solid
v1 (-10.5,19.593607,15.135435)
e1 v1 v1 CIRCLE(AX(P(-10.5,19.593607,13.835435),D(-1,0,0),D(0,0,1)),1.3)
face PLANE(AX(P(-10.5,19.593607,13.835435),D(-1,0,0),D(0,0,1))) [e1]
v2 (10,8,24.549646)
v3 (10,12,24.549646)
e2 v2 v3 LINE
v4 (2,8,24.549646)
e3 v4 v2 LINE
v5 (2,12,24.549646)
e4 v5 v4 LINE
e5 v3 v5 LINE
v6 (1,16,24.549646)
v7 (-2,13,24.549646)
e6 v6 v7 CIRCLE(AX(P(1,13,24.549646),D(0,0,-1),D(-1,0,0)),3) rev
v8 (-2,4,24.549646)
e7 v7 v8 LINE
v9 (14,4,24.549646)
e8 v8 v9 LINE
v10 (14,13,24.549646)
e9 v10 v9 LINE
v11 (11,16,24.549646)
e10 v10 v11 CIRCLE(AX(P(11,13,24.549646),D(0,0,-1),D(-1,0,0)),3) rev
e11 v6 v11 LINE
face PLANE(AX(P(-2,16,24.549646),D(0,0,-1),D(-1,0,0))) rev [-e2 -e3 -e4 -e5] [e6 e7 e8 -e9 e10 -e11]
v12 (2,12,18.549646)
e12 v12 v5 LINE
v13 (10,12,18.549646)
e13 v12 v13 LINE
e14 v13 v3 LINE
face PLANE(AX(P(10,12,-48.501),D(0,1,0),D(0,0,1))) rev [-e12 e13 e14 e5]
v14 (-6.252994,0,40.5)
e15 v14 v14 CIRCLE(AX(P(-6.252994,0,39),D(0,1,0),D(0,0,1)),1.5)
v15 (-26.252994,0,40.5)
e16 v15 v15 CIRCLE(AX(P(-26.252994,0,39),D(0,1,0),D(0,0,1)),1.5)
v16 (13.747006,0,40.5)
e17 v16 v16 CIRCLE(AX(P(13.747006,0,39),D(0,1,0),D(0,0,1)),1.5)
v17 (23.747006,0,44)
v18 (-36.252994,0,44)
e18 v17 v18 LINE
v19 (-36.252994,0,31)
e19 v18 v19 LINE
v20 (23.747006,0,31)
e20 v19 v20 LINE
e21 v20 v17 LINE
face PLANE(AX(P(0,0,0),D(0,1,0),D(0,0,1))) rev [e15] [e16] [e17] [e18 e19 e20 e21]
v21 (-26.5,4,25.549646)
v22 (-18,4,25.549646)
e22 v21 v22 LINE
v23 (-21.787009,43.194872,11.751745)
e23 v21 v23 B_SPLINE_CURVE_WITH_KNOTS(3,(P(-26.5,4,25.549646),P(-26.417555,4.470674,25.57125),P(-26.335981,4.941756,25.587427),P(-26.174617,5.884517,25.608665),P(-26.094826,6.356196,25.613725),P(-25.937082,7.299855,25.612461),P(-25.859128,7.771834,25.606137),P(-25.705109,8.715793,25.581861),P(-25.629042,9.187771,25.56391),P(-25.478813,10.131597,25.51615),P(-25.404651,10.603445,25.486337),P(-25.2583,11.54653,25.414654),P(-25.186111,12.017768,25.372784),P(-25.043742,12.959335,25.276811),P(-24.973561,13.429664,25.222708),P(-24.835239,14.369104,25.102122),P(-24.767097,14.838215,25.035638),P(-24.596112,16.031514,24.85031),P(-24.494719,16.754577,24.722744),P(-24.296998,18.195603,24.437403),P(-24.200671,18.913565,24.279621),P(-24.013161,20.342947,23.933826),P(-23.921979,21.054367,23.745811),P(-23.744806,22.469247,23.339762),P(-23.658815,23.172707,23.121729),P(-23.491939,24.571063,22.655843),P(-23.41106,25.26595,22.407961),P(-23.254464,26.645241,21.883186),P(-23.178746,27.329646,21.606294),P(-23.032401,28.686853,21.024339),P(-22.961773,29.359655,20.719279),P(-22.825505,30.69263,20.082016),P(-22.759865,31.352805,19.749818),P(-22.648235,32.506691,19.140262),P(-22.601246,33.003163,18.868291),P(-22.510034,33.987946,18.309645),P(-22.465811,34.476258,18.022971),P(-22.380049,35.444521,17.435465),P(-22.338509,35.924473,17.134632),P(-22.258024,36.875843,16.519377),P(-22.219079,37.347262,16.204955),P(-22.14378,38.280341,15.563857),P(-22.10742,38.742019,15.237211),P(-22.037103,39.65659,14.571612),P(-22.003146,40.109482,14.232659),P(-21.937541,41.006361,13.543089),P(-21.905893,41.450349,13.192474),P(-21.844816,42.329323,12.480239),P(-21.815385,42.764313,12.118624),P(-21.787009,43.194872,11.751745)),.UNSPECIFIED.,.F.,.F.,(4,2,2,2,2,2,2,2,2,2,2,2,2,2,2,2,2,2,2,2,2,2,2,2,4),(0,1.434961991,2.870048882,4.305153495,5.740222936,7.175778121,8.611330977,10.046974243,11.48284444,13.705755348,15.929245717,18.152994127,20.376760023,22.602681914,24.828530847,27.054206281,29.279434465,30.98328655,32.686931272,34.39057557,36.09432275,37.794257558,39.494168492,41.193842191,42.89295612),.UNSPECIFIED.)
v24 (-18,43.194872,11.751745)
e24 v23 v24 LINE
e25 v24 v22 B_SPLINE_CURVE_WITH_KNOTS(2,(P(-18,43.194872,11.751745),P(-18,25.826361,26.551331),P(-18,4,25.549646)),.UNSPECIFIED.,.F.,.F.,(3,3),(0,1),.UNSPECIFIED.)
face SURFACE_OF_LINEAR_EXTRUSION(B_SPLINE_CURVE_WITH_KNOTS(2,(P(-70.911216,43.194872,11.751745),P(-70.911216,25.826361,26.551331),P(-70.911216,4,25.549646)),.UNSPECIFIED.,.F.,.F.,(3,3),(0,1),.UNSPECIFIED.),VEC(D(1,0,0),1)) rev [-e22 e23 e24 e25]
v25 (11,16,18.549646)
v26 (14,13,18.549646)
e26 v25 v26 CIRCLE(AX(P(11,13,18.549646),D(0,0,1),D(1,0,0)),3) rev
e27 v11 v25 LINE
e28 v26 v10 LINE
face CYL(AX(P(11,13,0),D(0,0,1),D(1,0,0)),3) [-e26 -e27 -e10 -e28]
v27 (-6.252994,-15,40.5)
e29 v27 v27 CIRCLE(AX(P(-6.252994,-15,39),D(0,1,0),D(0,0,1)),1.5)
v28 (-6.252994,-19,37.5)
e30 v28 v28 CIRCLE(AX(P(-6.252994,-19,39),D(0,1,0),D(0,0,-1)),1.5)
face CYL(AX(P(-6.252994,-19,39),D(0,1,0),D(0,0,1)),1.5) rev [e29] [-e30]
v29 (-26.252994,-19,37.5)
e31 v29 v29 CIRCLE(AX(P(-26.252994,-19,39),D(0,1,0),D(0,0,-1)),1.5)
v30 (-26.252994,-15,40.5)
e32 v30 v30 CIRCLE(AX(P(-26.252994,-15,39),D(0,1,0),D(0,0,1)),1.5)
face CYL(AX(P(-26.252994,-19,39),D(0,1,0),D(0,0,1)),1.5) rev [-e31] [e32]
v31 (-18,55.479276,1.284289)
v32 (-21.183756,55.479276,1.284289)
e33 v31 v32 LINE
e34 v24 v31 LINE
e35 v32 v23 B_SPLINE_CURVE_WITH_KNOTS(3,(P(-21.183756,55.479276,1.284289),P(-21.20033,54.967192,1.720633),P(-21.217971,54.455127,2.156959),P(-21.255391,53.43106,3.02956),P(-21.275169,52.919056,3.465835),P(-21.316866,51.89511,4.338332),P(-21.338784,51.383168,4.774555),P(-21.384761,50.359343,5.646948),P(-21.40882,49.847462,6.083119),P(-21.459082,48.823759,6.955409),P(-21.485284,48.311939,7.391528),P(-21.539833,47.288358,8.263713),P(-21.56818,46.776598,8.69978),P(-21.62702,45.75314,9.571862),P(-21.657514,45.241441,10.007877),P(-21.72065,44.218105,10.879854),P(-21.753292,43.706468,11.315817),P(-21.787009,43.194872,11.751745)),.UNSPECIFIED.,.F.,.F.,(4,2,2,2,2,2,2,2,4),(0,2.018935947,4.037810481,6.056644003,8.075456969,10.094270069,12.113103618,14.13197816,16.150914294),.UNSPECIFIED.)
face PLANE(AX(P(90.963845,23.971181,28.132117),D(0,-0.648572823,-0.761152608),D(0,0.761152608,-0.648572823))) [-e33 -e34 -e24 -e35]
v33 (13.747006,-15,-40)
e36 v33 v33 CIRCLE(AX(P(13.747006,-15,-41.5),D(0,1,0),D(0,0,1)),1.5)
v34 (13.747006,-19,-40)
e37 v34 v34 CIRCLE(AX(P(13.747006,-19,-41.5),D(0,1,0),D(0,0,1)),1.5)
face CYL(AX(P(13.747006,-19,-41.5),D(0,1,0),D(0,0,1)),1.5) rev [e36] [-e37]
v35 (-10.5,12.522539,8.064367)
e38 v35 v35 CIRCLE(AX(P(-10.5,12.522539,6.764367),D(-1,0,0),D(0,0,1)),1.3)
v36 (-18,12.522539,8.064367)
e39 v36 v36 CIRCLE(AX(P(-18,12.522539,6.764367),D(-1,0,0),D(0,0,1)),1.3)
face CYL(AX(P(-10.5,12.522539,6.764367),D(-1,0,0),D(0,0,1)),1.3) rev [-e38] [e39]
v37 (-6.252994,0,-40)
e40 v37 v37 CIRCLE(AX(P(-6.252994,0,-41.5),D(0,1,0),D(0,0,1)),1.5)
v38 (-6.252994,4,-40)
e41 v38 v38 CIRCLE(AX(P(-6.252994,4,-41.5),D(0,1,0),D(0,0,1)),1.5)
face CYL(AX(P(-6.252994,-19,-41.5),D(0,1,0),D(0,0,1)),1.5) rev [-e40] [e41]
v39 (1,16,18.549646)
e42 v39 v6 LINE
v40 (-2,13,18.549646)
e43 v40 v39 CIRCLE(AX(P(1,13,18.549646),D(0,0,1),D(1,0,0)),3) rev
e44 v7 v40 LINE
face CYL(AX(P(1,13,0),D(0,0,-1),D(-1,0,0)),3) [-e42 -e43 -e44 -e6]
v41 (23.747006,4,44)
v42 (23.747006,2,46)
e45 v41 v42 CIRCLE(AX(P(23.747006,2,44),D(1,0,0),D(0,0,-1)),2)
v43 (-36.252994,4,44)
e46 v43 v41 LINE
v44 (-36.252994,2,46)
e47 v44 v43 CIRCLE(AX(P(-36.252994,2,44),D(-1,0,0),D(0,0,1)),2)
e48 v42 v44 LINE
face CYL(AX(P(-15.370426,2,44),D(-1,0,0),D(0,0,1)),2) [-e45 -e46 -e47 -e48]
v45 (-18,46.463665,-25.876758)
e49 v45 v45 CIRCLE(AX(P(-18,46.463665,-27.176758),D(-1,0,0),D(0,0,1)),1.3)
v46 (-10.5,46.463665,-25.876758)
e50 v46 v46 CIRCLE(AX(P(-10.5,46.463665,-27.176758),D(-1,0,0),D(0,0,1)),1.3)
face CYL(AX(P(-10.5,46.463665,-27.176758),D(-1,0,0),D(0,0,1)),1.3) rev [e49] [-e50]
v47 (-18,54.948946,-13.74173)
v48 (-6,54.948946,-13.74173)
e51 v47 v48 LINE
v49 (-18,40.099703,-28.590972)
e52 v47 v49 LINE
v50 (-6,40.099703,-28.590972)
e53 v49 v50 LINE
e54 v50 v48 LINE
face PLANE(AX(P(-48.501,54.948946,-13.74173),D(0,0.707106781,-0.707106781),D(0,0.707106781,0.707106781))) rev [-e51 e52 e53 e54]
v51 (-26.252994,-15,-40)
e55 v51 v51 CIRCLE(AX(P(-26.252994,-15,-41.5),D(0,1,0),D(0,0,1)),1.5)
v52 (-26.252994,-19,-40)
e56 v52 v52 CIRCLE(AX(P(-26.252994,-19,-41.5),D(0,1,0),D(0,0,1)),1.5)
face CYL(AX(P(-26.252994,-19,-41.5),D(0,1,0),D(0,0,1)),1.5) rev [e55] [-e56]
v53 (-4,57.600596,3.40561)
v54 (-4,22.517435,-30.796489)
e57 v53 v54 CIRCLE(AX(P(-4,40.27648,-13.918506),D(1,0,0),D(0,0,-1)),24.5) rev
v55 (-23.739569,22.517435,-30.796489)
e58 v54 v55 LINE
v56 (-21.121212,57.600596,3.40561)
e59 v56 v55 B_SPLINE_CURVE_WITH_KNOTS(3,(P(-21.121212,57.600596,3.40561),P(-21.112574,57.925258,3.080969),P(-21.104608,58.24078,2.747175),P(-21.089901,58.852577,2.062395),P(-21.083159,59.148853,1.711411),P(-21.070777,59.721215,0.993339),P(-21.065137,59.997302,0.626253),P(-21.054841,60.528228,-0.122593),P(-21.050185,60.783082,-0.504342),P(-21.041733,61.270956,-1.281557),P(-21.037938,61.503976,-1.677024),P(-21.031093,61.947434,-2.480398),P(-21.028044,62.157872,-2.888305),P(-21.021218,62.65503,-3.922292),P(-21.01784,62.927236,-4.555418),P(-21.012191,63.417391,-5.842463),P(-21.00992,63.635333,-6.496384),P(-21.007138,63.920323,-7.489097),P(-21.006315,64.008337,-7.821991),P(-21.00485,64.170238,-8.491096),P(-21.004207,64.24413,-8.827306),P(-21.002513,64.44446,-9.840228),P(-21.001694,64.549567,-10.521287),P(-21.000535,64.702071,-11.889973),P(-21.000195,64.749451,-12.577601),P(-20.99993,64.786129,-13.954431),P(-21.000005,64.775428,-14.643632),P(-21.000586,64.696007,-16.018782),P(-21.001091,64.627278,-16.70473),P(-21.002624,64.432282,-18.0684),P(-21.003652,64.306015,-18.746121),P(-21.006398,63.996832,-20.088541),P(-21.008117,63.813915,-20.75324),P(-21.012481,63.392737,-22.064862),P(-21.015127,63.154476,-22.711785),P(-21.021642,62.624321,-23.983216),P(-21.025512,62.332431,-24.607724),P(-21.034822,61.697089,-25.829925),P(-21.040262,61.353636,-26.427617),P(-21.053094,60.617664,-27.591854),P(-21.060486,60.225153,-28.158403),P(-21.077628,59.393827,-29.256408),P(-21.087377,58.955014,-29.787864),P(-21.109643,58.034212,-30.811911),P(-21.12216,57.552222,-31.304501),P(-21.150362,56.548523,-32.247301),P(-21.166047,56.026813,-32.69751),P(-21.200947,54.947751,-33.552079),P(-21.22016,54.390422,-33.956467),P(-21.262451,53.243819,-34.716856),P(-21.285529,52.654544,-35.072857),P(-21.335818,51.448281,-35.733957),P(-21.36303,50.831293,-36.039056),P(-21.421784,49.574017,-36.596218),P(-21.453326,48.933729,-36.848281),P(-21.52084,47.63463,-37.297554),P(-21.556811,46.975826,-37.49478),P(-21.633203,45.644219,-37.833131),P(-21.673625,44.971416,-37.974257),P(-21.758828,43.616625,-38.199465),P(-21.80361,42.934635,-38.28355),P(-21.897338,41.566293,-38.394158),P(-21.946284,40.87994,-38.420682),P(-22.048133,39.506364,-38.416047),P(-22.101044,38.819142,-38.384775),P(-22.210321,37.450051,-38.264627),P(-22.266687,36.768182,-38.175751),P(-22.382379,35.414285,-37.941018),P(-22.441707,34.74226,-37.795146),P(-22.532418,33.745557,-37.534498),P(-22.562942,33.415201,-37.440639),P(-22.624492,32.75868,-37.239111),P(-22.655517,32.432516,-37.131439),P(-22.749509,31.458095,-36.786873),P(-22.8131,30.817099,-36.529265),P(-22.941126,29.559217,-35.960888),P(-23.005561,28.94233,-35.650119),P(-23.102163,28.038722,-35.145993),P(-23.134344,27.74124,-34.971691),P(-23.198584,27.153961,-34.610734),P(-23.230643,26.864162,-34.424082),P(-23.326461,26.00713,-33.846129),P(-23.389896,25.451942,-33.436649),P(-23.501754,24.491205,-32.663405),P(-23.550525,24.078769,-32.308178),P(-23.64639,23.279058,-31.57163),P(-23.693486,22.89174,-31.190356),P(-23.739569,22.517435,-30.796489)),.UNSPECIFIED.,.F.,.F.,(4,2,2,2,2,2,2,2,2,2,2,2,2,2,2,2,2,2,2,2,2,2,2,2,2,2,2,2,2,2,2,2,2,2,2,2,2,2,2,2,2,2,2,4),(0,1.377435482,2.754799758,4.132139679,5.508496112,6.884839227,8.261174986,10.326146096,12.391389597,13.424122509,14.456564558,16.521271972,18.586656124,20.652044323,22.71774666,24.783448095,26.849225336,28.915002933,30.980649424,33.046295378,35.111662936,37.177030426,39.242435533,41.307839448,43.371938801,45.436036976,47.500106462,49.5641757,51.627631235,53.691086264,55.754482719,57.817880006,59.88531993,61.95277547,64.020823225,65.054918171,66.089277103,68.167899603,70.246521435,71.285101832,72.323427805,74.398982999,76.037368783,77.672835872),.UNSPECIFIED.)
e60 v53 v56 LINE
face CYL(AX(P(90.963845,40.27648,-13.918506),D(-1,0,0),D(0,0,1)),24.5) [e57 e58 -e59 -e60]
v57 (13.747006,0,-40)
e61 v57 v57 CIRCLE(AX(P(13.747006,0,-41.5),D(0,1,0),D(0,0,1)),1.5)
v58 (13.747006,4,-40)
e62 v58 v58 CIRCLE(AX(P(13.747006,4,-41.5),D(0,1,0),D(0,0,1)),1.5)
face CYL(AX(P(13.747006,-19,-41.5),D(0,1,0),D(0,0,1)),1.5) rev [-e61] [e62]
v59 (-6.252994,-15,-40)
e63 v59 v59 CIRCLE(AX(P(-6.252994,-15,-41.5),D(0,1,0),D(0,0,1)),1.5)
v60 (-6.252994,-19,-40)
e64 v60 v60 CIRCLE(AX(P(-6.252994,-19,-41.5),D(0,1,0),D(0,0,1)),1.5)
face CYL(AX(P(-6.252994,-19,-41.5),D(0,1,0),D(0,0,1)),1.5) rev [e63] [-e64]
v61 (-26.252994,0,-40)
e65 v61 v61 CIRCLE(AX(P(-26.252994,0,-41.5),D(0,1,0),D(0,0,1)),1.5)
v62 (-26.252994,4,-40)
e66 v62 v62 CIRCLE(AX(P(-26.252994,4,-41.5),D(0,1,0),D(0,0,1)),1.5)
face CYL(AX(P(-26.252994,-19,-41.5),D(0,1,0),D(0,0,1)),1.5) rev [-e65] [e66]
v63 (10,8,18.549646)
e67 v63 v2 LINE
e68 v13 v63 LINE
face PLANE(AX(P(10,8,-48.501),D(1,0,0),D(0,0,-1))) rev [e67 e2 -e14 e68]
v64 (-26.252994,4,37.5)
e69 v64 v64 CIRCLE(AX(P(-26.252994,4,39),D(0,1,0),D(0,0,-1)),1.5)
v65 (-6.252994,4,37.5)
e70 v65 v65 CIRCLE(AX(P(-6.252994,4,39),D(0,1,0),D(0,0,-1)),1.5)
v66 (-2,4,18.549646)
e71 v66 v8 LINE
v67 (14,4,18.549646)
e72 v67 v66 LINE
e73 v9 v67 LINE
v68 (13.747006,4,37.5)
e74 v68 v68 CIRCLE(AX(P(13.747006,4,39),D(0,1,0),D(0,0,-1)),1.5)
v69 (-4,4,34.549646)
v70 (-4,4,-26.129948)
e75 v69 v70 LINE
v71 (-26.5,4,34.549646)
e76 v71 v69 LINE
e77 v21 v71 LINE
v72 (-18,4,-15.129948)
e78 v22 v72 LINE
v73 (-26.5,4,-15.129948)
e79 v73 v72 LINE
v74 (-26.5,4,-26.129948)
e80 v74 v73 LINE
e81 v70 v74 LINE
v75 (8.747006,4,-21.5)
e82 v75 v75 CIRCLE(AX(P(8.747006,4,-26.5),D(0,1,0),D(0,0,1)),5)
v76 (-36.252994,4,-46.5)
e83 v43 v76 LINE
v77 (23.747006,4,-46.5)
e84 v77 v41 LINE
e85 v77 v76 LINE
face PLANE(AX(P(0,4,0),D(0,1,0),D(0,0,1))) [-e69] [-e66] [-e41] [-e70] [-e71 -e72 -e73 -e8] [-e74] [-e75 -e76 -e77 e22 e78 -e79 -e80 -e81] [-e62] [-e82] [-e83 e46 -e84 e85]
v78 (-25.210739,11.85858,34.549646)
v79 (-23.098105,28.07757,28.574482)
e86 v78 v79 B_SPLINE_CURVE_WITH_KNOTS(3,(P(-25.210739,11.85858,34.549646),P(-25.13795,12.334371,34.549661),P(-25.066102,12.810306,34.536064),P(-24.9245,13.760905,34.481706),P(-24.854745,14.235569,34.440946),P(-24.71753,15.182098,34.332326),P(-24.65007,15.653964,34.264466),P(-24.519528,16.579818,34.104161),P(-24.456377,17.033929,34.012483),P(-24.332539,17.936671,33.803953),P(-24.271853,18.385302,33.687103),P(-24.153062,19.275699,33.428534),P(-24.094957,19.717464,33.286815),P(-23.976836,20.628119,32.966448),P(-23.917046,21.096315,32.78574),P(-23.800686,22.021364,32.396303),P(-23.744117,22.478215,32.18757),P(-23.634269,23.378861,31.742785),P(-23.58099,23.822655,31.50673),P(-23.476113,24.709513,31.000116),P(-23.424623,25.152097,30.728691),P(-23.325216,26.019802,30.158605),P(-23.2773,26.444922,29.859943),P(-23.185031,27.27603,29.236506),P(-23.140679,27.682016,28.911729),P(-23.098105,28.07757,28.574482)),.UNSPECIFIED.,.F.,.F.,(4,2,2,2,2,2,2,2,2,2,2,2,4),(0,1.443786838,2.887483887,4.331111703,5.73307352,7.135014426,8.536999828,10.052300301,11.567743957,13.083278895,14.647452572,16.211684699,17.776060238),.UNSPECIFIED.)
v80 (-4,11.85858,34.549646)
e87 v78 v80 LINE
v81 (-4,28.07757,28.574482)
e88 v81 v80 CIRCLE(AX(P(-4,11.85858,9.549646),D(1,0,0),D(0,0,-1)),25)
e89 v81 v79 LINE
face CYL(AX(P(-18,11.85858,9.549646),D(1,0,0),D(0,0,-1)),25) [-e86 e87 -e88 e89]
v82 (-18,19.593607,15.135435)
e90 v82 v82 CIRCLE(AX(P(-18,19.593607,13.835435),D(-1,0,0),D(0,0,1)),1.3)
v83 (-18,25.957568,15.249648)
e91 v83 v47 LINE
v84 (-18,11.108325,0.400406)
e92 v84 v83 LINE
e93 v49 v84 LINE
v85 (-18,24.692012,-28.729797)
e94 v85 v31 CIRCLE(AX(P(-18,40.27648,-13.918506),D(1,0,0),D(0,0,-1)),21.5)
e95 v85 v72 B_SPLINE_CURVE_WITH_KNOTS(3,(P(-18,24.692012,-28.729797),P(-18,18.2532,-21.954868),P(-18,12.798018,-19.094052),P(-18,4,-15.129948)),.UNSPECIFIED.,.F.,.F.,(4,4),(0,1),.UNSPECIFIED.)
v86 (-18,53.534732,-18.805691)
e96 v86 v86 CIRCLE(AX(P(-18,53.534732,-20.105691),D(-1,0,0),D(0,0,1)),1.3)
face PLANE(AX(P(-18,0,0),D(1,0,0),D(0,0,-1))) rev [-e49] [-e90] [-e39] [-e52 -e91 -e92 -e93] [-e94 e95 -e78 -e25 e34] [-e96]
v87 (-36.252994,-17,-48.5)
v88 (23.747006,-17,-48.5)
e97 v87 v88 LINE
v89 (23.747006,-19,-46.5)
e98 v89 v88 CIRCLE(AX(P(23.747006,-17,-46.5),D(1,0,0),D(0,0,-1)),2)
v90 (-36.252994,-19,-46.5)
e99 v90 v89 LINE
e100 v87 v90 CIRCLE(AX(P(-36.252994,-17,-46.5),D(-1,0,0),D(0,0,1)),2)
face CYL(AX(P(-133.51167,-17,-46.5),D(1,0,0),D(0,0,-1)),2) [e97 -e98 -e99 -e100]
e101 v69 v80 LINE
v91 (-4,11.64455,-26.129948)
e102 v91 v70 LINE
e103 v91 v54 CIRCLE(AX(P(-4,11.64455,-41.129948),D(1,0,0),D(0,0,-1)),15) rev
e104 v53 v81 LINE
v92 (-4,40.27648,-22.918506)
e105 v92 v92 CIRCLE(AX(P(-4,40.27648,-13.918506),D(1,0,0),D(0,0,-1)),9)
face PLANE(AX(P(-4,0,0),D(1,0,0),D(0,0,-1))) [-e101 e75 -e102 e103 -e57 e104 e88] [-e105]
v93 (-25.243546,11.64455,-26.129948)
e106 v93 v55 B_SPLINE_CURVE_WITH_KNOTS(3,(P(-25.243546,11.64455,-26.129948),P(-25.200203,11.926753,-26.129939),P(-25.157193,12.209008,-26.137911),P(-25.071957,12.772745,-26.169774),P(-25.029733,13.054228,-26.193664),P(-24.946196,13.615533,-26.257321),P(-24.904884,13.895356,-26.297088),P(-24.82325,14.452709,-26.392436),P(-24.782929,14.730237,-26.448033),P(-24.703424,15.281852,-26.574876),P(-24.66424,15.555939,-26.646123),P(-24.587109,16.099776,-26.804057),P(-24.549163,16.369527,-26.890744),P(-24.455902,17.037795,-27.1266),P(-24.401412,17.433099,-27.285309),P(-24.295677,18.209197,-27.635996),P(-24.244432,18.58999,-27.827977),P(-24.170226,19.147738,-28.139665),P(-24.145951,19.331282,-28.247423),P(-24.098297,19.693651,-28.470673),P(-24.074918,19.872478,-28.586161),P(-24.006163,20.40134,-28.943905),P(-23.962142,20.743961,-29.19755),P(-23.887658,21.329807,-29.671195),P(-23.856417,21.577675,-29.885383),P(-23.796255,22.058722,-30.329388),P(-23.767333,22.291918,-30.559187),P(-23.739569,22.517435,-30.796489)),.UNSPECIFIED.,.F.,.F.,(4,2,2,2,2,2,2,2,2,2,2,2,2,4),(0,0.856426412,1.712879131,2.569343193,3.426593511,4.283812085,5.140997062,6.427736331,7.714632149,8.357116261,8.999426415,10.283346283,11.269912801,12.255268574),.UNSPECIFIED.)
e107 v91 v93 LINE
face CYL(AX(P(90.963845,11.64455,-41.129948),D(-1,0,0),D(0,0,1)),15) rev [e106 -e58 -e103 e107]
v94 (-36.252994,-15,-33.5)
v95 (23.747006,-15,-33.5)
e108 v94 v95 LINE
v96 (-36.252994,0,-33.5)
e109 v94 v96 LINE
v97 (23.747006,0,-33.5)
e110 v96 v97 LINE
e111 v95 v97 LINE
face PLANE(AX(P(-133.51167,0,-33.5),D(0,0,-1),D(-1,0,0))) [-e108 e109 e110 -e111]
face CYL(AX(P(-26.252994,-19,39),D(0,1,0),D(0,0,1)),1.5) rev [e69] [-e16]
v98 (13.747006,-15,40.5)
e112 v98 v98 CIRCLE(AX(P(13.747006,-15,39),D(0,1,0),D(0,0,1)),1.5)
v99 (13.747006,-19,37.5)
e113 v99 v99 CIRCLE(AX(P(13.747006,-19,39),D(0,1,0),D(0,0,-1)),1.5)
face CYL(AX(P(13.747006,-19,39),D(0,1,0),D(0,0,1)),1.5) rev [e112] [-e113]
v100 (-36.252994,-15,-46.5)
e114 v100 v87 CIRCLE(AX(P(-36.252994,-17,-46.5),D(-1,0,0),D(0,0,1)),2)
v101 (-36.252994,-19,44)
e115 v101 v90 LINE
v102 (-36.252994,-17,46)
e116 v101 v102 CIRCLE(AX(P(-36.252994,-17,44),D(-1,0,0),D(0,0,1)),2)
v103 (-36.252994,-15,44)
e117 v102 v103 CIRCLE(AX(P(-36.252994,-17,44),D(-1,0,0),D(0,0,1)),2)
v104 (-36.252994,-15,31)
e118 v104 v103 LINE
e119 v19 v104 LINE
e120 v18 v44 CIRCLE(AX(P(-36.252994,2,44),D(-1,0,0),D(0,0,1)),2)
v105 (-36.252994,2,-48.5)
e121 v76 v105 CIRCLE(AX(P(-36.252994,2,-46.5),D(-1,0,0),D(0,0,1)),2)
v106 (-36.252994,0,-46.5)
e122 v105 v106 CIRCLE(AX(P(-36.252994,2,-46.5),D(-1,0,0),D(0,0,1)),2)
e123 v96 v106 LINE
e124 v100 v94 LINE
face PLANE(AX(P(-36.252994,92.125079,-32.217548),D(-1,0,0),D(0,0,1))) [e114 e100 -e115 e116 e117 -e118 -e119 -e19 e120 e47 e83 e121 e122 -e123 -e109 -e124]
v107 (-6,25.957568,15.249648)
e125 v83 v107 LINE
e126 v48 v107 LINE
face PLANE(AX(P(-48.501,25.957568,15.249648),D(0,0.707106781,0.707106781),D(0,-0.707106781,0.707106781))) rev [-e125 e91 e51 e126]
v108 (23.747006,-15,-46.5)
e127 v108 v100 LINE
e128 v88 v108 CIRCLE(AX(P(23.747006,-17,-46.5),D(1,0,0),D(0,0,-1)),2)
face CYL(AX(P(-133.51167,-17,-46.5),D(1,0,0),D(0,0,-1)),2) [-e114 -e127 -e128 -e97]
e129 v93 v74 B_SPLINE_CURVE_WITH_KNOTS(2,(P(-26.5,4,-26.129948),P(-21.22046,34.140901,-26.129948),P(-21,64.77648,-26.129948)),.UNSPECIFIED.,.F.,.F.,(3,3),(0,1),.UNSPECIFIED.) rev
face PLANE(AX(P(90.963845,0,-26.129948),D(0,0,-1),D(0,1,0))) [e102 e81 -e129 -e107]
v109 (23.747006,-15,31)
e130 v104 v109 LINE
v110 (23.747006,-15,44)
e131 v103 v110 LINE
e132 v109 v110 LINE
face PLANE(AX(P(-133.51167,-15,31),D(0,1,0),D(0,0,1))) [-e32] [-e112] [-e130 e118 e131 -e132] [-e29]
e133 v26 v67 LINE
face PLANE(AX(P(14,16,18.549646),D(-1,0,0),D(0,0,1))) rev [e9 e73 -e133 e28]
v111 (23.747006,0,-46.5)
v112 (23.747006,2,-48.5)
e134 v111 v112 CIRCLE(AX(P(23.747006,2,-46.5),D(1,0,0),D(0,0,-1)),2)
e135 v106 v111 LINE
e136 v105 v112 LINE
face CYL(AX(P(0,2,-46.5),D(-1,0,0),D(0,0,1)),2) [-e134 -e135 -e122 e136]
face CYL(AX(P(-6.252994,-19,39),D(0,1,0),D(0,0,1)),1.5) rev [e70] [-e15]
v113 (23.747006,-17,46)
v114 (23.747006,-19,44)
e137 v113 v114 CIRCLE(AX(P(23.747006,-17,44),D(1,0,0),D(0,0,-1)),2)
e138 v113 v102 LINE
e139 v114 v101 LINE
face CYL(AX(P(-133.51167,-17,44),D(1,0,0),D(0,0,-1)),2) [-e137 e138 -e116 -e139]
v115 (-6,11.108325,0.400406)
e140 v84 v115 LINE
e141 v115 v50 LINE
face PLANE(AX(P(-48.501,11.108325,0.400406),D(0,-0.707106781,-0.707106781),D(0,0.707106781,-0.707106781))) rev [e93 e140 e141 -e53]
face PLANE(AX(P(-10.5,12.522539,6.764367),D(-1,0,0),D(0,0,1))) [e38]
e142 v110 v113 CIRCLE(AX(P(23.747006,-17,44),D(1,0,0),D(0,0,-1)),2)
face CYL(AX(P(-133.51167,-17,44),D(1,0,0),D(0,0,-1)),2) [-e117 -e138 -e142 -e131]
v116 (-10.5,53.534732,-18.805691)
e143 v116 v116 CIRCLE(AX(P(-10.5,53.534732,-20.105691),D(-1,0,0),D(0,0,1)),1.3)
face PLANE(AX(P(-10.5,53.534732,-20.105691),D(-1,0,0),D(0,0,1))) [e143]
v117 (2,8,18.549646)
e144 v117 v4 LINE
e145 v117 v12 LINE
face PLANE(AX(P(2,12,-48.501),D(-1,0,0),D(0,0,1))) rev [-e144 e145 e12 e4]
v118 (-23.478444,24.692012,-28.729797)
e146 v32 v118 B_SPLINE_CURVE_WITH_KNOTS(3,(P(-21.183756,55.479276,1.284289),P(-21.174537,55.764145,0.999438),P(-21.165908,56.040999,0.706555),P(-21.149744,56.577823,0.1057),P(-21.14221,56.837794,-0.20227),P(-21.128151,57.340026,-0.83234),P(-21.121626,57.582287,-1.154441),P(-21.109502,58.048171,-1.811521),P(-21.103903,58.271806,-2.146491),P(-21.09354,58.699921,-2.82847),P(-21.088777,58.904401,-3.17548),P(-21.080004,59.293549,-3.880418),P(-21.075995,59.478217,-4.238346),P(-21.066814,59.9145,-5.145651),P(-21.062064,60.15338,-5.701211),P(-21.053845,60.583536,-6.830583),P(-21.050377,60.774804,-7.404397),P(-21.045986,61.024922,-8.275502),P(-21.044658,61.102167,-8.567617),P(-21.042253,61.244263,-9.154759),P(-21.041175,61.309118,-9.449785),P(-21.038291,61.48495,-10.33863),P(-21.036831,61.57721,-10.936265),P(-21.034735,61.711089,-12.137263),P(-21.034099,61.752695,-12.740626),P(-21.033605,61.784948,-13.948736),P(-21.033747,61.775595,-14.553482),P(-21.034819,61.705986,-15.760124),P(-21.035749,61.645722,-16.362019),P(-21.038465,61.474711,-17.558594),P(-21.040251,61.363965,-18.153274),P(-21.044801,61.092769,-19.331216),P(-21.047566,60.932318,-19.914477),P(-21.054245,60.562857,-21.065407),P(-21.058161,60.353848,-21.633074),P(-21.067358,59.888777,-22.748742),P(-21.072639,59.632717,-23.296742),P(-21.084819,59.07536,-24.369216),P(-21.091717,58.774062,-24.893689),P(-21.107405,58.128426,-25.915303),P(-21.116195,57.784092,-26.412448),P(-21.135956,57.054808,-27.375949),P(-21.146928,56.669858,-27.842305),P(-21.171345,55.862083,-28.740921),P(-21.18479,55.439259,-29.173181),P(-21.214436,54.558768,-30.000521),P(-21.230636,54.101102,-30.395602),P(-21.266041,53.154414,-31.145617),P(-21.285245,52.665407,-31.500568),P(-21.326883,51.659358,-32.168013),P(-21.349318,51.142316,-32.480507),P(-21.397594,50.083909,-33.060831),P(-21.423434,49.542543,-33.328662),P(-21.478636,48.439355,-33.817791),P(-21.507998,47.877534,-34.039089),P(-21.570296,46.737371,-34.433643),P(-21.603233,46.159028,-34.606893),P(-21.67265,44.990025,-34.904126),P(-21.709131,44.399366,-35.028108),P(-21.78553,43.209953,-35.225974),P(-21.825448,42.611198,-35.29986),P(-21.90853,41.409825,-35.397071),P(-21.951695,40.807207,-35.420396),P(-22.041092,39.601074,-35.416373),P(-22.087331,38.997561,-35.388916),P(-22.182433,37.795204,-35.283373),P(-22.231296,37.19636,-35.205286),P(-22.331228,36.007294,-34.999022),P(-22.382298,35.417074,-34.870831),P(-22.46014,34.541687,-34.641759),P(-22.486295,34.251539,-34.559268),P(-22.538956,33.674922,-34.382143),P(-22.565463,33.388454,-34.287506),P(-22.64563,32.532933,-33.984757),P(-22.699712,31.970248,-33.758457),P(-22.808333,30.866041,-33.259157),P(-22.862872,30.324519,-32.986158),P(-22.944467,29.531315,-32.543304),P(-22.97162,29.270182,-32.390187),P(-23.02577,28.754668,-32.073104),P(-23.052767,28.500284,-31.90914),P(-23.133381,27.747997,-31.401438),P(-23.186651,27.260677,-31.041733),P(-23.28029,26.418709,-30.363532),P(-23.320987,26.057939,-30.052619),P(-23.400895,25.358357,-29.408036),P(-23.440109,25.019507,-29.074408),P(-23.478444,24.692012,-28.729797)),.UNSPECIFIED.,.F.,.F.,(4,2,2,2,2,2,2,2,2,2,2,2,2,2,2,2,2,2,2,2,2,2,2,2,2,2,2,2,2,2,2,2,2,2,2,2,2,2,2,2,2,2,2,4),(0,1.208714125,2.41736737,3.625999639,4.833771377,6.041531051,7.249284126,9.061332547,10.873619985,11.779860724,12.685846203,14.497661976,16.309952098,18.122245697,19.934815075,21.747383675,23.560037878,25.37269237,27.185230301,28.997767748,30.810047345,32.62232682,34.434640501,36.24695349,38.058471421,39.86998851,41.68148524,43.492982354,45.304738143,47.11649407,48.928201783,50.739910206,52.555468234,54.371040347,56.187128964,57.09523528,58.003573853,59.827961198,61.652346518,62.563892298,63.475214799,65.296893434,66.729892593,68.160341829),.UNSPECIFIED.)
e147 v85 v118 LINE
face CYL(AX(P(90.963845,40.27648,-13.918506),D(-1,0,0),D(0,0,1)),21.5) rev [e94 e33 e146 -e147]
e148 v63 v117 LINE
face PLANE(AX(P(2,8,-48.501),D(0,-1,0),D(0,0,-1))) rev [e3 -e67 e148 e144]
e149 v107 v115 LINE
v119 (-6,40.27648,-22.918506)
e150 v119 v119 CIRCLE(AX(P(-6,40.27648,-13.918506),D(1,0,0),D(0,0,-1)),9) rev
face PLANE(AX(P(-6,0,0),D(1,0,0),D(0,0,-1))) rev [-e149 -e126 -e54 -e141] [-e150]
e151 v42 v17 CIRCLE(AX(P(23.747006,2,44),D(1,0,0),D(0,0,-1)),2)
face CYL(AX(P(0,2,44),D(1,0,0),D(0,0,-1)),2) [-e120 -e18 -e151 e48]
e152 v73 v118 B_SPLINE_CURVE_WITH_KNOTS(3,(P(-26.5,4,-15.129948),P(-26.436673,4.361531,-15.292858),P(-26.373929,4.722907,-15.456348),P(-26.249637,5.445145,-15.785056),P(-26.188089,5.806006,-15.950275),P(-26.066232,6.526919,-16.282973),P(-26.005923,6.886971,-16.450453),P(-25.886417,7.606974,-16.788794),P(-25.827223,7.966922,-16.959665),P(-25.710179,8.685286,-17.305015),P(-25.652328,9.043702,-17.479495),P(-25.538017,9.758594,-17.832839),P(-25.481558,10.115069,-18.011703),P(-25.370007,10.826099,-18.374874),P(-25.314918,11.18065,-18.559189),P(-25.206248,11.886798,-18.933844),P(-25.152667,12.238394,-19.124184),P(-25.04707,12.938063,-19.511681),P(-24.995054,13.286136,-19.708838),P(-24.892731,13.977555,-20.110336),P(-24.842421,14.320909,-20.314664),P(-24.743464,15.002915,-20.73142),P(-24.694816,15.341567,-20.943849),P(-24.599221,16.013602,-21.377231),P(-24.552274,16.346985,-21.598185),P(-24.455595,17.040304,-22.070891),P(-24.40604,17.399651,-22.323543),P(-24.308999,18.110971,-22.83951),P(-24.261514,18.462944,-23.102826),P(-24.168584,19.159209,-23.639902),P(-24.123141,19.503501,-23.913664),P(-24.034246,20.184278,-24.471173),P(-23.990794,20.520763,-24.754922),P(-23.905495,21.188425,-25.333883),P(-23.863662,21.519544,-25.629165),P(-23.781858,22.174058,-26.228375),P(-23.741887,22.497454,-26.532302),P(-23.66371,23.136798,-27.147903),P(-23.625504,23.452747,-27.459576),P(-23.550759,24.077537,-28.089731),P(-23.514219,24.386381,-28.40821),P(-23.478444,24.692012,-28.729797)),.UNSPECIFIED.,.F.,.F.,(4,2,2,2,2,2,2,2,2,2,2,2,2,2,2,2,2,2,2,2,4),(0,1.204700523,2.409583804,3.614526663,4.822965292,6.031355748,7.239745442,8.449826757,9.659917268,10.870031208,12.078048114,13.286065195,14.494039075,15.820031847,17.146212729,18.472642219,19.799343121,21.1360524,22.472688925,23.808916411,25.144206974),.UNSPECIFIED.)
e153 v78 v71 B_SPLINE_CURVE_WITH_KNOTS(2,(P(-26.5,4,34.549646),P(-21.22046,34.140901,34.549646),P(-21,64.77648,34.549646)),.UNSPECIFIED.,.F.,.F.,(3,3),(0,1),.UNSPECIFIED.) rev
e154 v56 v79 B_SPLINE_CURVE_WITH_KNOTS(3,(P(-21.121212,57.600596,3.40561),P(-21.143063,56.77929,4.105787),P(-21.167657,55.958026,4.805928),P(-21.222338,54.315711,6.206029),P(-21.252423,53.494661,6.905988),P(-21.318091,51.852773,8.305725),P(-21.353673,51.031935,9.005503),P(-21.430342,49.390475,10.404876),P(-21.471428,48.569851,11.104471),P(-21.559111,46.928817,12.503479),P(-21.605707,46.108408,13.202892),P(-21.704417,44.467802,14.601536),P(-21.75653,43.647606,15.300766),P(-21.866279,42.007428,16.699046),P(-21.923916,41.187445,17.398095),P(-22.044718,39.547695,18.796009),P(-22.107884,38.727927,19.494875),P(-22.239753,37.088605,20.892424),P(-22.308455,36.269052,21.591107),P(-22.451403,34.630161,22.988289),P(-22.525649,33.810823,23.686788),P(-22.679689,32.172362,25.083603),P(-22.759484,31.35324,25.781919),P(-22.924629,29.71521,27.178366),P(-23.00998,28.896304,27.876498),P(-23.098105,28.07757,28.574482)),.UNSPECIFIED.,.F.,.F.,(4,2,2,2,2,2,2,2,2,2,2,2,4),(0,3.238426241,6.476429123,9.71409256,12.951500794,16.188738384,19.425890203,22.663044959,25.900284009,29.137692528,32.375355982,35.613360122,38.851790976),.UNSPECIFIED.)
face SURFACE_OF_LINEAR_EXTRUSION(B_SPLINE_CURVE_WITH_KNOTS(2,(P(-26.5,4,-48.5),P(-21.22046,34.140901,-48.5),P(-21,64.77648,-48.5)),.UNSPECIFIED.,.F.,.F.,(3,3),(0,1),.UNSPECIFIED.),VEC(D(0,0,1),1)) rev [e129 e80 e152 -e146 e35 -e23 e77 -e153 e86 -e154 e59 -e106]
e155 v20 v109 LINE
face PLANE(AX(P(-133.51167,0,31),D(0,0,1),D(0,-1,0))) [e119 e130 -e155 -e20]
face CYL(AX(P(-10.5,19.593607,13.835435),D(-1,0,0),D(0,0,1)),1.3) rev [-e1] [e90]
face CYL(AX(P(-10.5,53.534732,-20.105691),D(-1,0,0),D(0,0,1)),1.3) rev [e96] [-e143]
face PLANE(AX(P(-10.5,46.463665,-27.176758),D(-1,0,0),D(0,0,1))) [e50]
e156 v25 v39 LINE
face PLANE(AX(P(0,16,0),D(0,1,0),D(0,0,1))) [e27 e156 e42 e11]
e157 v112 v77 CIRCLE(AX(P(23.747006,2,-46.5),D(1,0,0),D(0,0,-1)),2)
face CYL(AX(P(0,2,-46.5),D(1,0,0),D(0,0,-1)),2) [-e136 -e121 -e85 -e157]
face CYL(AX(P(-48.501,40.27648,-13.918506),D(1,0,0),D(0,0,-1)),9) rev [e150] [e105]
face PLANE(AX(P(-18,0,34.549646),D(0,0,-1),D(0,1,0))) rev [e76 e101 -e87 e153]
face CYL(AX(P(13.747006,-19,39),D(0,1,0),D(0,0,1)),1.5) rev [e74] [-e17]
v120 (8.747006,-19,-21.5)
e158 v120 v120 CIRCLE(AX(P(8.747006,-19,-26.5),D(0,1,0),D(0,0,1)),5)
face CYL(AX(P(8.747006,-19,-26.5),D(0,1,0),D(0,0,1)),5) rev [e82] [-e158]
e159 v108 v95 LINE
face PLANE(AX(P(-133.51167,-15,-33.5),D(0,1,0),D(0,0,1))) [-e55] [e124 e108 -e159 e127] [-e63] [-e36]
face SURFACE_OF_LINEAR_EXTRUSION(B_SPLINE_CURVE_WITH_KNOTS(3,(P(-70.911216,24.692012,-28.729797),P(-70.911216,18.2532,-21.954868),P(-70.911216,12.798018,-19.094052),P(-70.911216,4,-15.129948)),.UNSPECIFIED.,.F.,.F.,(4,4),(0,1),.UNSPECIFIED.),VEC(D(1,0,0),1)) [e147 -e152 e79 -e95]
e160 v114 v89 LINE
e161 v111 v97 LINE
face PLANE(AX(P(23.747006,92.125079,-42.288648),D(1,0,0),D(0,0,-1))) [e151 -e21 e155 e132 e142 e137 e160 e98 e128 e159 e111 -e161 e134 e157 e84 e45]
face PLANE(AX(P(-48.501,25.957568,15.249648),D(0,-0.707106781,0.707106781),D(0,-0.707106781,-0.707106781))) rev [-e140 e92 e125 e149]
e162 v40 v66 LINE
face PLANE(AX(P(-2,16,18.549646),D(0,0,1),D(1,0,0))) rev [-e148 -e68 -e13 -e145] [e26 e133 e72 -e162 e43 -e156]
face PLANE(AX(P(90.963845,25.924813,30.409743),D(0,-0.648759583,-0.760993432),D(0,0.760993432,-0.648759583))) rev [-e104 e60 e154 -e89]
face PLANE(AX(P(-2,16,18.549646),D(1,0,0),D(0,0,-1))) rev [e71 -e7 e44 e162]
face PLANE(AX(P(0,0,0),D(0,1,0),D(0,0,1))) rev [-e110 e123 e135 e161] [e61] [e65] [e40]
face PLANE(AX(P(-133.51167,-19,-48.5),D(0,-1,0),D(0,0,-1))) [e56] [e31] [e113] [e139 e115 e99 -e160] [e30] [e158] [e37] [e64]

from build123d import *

# Parameters (mm, degrees)
SKETCH2_R                       = 48.5
BOSS_EXTRUDE1_DEPTH             = 4
BOSS_EXTRUDE2_DEPTH             = 14
CUT_EXTRUDE5_REACH              = 97.597
SKETCH9_R                       = 1.3
CUT_EXTRUDE6_DEPTH              = 7.5
CUT_EXTRUDE9_REACH              = 96.471
SKETCH11_R                      = 9
BOSS_EXTRUDE7_DEPTH             = 9
BOSS_EXTRUDE7_DIRECTION_2_REACH = 104.912
BOSS_EXTRUDE10_DEPTH            = 9
SKETCH27_W                      = 16
SKETCH27_H                      = 6
BOSS_EXTRUDE11_DEPTH            = 12
FILLET6_R                       = 3
CUT_EXTRUDE16_REACH             = 111.016
SKETCH28_W                      = 8
SKETCH28_H                      = 4
CUT_EXTRUDE17_DEPTH             = 95.342420983
CUT_EXTRUDE17_DEPTH_BACK        = 95.342420983
CUT_EXTRUDE18_DEPTH             = 4
BOSS_EXTRUDE12_DEPTH            = 4
BOSS_EXTRUDE13_DEPTH            = 60
FILLET7_R                       = 2
SKETCH34_R                      = 5
CUT_EXTRUDE19_DEPTH             = 86.792249968
SKETCH36_R                      = 1.5
CUT_EXTRUDE20_DEPTH             = 86.792249968


with BuildPart() as part:
    # Sketch2 → Boss-Extrude1 (new body)
    with BuildSketch(Plane(origin=(0, 0, 0), x_dir=(1, 0, 0), z_dir=(0, 1, 0))):
        with Locations(Location((0, 0, 0), (0, 0, 270))):
            Circle(SKETCH2_R)
    extrude(amount=BOSS_EXTRUDE1_DEPTH)

    # Sketch7 → Boss-Extrude2 (add)
    with BuildSketch(Plane(origin=(-4, 0, 0), x_dir=(0, 0, -1), z_dir=(1, 0, 0))):
        with BuildLine():
            Line((23.129947874, 4), (23.129947874, 11.644549616))
            ThreePointArc((23.129947874, 11.644549616), (24.589048403, 18.743749901), (28.729797284, 24.692011643))
            ThreePointArc((28.729797284, 24.692011643), (29.313383054, 55.284736897), (-1.284289494, 55.479275971))
            Line((-1.284289494, 55.479275971), (-27.227315747, 29.536249718))
            ThreePointArc((-27.227315747, 29.536249718), (-32.64663453, 21.425665997), (-34.549646217, 11.858580188))
            Line((-34.549646217, 11.858580188), (-34.549646217, 4))
            Line((-34.549646217, 4), (23.129947874, 4))
        make_face()
    extrude(amount=-BOSS_EXTRUDE2_DEPTH)

    # Sketch8 → Cut-Extrude5 (cut, up to next)
    with BuildSketch(Plane(origin=(-6, 0, 0), x_dir=(0, 0, -1), z_dir=(1, 0, 0)), mode=Mode.PRIVATE) as cut_extrude5_sk1:
        Polygon((-15.249648422, 25.957567857), (13.741729607, 54.948945886), (28.590972012, 40.099703481), (-0.400406017, 11.108325452), align=None)
    cut_extrude5_tool1 = extrude(cut_extrude5_sk1.sketch, amount=-CUT_EXTRUDE5_REACH, mode=Mode.PRIVATE) & part.part
    add(cut_extrude5_tool1.solids().sort_by_distance((-6, 33.028636, -6.670662))[0], mode=Mode.SUBTRACT)

    # Sketch9 → Cut-Extrude6 (cut)
    with BuildSketch(Plane.ZY.offset(18)):
        with Locations((-20.105690637, 53.534732323)):
            Circle(SKETCH9_R)
        with Locations((-27.176758449, 46.463664511)):
            Circle(SKETCH9_R)
        with Locations((6.764367048, 12.522539014)):
            Circle(SKETCH9_R)
        with Locations((13.83543486, 19.593606826)):
            Circle(SKETCH9_R)
    extrude(amount=-CUT_EXTRUDE6_DEPTH, mode=Mode.SUBTRACT)

    # Sketch11 → Cut-Extrude9 (cut, up to next)
    with BuildSketch(Plane(origin=(-4, 0, 0), x_dir=(0, 0, -1), z_dir=(1, 0, 0)), mode=Mode.PRIVATE) as cut_extrude9_sk1:
        with Locations((13.918506302, 40.276480176)):
            Circle(SKETCH11_R)
    cut_extrude9_tool1 = extrude(cut_extrude9_sk1.sketch, amount=-CUT_EXTRUDE9_REACH, mode=Mode.PRIVATE) & part.part
    add(cut_extrude9_tool1.solids().sort_by_distance((-4, 40.27648, -13.918506))[0], mode=Mode.SUBTRACT)

    # Sketch17 → Boss-Extrude7 (add)
    with BuildSketch(Plane.ZY.offset(18)):
        with BuildLine():
            ThreePointArc((34.549646217, 11.858580188), (33.008342843, 20.500891953), (28.574482006, 28.077569775))
            ThreePointArc((28.574482006, 28.077569775), (27.915386359, 28.820289685), (27.227315747, 29.536249718))
            Line((27.227315747, 29.536249718), (1.284289494, 55.479275971))
            Line((1.284289494, 55.479275971), (26.295003593, 26.127182305))
            ThreePointArc((26.295003593, 26.127182305), (30.194232218, 19.461281607), (31.549646217, 11.858580188))
            Line((31.549646217, 11.858580188), (31.549646217, 4))
            Line((31.549646217, 4), (34.549646217, 4))
            Line((34.549646217, 4), (34.549646217, 11.858580188))
        make_face()
        with BuildLine():
            Line((28.574482006, 28.077569775), (3.405609837, 57.600596315))
            ThreePointArc((3.405609837, 57.600596315), (-31.461505391, 57.378912253), (-30.796489049, 22.517434639))
            ThreePointArc((-30.796489049, 22.517434639), (-27.345864981, 17.560549854), (-26.129947874, 11.644549616))
            Line((-26.129947874, 11.644549616), (-26.129947874, 4))
            Line((-26.129947874, 4), (-23.129947874, 4))
            Line((-23.129947874, 4), (-23.129947874, 11.644549616))
            ThreePointArc((-23.129947874, 11.644549616), (-24.589048403, 18.743749901), (-28.729797284, 24.692011643))
            ThreePointArc((-28.729797284, 24.692011643), (-29.313383054, 55.284736897), (1.284289494, 55.479275971))
            Line((1.284289494, 55.479275971), (27.227315747, 29.536249718))
            ThreePointArc((27.227315747, 29.536249718), (27.915386359, 28.820289685), (28.574482006, 28.077569775))
        make_face()
    extrude(amount=BOSS_EXTRUDE7_DEPTH)

    # Boss-Extrude7 direction 2: up to this face of the body (flat: up to its plane)
    boss_extrude7_direction_2_end = Plane(part.part.faces().sort_by_distance((-4, 28.276431801, -1.649713195))[0])
    # Sketch17 → Boss-Extrude7 direction 2 (add, up to the picked face)
    with BuildSketch(Plane.ZY.offset(18), mode=Mode.PRIVATE) as boss_extrude7_direction_2_sk1:
        with BuildLine():
            ThreePointArc((34.549646217, 11.858580188), (33.008342843, 20.500891953), (28.574482006, 28.077569775))
            ThreePointArc((28.574482006, 28.077569775), (27.915386359, 28.820289685), (27.227315747, 29.536249718))
            Line((27.227315747, 29.536249718), (1.284289494, 55.479275971))
            Line((1.284289494, 55.479275971), (26.295003593, 26.127182305))
            ThreePointArc((26.295003593, 26.127182305), (30.194232218, 19.461281607), (31.549646217, 11.858580188))
            Line((31.549646217, 11.858580188), (31.549646217, 4))
            Line((31.549646217, 4), (34.549646217, 4))
            Line((34.549646217, 4), (34.549646217, 11.858580188))
        make_face()
    boss_extrude7_direction_2_tool1 = split(extrude(boss_extrude7_direction_2_sk1.sketch, amount=-BOSS_EXTRUDE7_DIRECTION_2_REACH, mode=Mode.PRIVATE), bisect_by=boss_extrude7_direction_2_end, keep=Keep.BOTH, mode=Mode.PRIVATE)
    # Sketch17 → Boss-Extrude7 direction 2 (add, up to the picked face)
    with BuildSketch(Plane.ZY.offset(18), mode=Mode.PRIVATE) as boss_extrude7_direction_2_sk2:
        with BuildLine():
            Line((28.574482006, 28.077569775), (3.405609837, 57.600596315))
            ThreePointArc((3.405609837, 57.600596315), (-31.461505391, 57.378912253), (-30.796489049, 22.517434639))
            ThreePointArc((-30.796489049, 22.517434639), (-27.345864981, 17.560549854), (-26.129947874, 11.644549616))
            Line((-26.129947874, 11.644549616), (-26.129947874, 4))
            Line((-26.129947874, 4), (-23.129947874, 4))
            Line((-23.129947874, 4), (-23.129947874, 11.644549616))
            ThreePointArc((-23.129947874, 11.644549616), (-24.589048403, 18.743749901), (-28.729797284, 24.692011643))
            ThreePointArc((-28.729797284, 24.692011643), (-29.313383054, 55.284736897), (1.284289494, 55.479275971))
            Line((1.284289494, 55.479275971), (27.227315747, 29.536249718))
            ThreePointArc((27.227315747, 29.536249718), (27.915386359, 28.820289685), (28.574482006, 28.077569775))
        make_face()
    boss_extrude7_direction_2_tool2 = split(extrude(boss_extrude7_direction_2_sk2.sketch, amount=-BOSS_EXTRUDE7_DIRECTION_2_REACH, mode=Mode.PRIVATE), bisect_by=boss_extrude7_direction_2_end, keep=Keep.BOTH, mode=Mode.PRIVATE)
    add(boss_extrude7_direction_2_tool1.solids().sort_by(Axis((-18, 4.612919, 33.049646), (1, 0, 0)))[0])
    add(boss_extrude7_direction_2_tool2.solids().sort_by(Axis((-18, 43.147366, 14.895406), (1, 0, 0)))[0])

    # Sketch25 → Boss-Extrude10 (add)
    with BuildSketch(Plane.ZY.offset(18)):
        with BuildLine():
            ThreePointArc((-28.729797284, 24.692011643), (-24.589048403, 18.743749901), (-23.129947874, 11.644549616))
            Line((-23.129947874, 11.644549616), (-23.129947874, 4))
            Line((-23.129947874, 4), (-15.129947874, 4))
            add(Edge.make_bspline(
                [(-28.729797284, 24.692011643), (-21.954867515, 18.253200081), (-19.09405247, 12.798017691), (-15.129947874, 4)],
                knots=[0, 0, 0, 0, 1, 1, 1, 1], degree=3))
        make_face()
        with BuildLine():
            add(Edge.make_bspline(
                [(11.751744758, 43.194871529), (26.551331141, 25.826361218), (25.549646217, 4)],
                knots=[0, 0, 0, 1, 1, 1], degree=2))
            Line((25.549646217, 4), (31.549646217, 4))
            Line((31.549646217, 4), (31.549646217, 11.858580188))
            ThreePointArc((31.549646217, 11.858580188), (30.194232218, 19.461281607), (26.295003593, 26.127182305))
            Line((26.295003593, 26.127182305), (11.751744758, 43.194871529))
        make_face()
    extrude(amount=BOSS_EXTRUDE10_DEPTH)

    # Sketch27 → Boss-Extrude11 (add)
    with BuildSketch(Plane(origin=(0, 4, 0), x_dir=(1, 0, 0), z_dir=(0, 1, 0))):
        with Locations((6, -21.549646217)):
            Rectangle(SKETCH27_W, SKETCH27_H)
    extrude(amount=BOSS_EXTRUDE11_DEPTH)

    # Fillet6
    fillet6_edges = [part.edges().sort_by_distance(p)[0] for p in [
        (-2, 16, 21.549646217),
        (14, 16, 21.549646217),
    ]]
    fillet(fillet6_edges, radius=FILLET6_R)

    # Sketch28 → Cut-Extrude16 (cut, up to next)
    with BuildSketch(Plane.XY.offset(24.549646217), mode=Mode.PRIVATE) as cut_extrude16_sk1:
        with Locations((6, 10)):
            Rectangle(SKETCH28_W, SKETCH28_H)
    cut_extrude16_tool1 = extrude(cut_extrude16_sk1.sketch, amount=-CUT_EXTRUDE16_REACH, mode=Mode.PRIVATE) & part.part
    add(cut_extrude16_tool1.solids().sort_by_distance((6, 10, 24.549646))[0], mode=Mode.SUBTRACT)

    # Sketch29 → Cut-Extrude17 (cut, two sides: drawn at the far end of the back side and taken through both)
    with BuildSketch(Plane.XY.offset(-CUT_EXTRUDE17_DEPTH_BACK)):
        with BuildLine():
            Line((-21, 64.776480176), (-27, 64.776480176))
            Line((-27, 64.776480176), (-27, 4))
            Line((-27, 4), (-26.5, 4))
            add(Edge.make_bspline(
                [(-21, 64.776480176), (-21.220459696, 34.140901434), (-26.5, 4)],
                knots=[0, 0, 0, 1, 1, 1], degree=2))
        make_face()
    extrude(amount=CUT_EXTRUDE17_DEPTH + CUT_EXTRUDE17_DEPTH_BACK, mode=Mode.SUBTRACT)

    # Sketch30 → Cut-Extrude18 (cut)
    with BuildSketch(Plane(origin=(0, 0, 0), x_dir=(1, 0, 0), z_dir=(0, 1, 0))):
        with BuildLine():
            Line((-36.252994357, 32.217548015), (-36.252994357, -32.217548015))
            ThreePointArc((-36.252994357, -32.217548015), (-48.5, 0), (-36.252994357, 32.217548015))
        make_face()
        with BuildLine():
            Line((-15.370426149, -46), (15.370426149, -46))
            ThreePointArc((15.370426149, -46), (0, -48.5), (-15.370426149, -46))
        make_face()
        with BuildLine():
            Line((23.747005643, 42.288647685), (23.747005643, -42.288647685))
            ThreePointArc((23.747005643, -42.288647685), (48.5, 0), (23.747005643, 42.288647685))
        make_face()
    extrude(amount=CUT_EXTRUDE18_DEPTH, mode=Mode.SUBTRACT)

    # Sketch33 → Boss-Extrude12 (add)
    with BuildSketch(Plane.XZ):
        Polygon((0, -48.5), (23.747005643, -48.5), (23.747005643, -42.288647685), (23.747005643, 42.288647685), (23.747005643, 46), (15.370426149, 46), (-15.370426149, 46), (-36.252994357, 46), (-36.252994357, 32.217548015), (-36.252994357, -32.217548015), (-36.252994357, -48.5), align=None)
    extrude(amount=-BOSS_EXTRUDE12_DEPTH)

    # Sketch35 → Boss-Extrude13 (add)
    with BuildSketch(Plane(origin=(23.747005643, 0, 0), x_dir=(0, 0, -1), z_dir=(1, 0, 0))):
        Polygon((48.5, -15), (48.5, -19), (-46, -19), (-46, -15), (-31, -15), (-31, 0), (-46, 0), (-46, 4), (48.5, 4), (48.5, 0), (33.5, 0), (33.5, -15), align=None)
    extrude(amount=-BOSS_EXTRUDE13_DEPTH)

    # Fillet7
    fillet7_edges = [part.edges().sort_by_distance(p)[0] for p in [
        (-6.252994357, 0, 46),
        (-6.252994357, 4, 46),
        (-6.252994357, 4, -48.5),
        (-6.252994357, 0, -48.5),
        (-6.252994357, -15, 46),
        (-6.252994357, -19, 46),
        (-6.252994357, -19, -48.5),
        (-6.252994357, -15, -48.5),
    ]]
    fillet(fillet7_edges, radius=FILLET7_R - 0.0001)  # a hair under: the kernel refuses the full size

    # Sketch34 → Cut-Extrude19 (cut, through all)
    with BuildSketch(Plane(origin=(0, 4, 0), x_dir=(1, 0, 0), z_dir=(0, 1, 0))):
        with Locations(Location((8.747005643, 26.5, 0), (0, 0, 270))):
            Circle(SKETCH34_R)
    extrude(amount=-CUT_EXTRUDE19_DEPTH, mode=Mode.SUBTRACT)

    # Sketch36 → Cut-Extrude20 (cut, through all)
    with BuildSketch(Plane(origin=(0, 4, 0), x_dir=(1, 0, 0), z_dir=(0, 1, 0))):
        with Locations(Location((-6.252994357, 41.5, 0), (0, 0, 270))):
            Circle(SKETCH36_R)
        with Locations(Location((13.747005643, 41.5, 0), (0, 0, 270))):
            Circle(SKETCH36_R)
        with Locations(Location((-26.252994357, 41.5, 0), (0, 0, 270))):
            Circle(SKETCH36_R)
        with Locations(Location((-26.252994357, -39, 0), (0, 0, 270))):
            Circle(SKETCH36_R)
        with Locations(Location((-6.252994357, -39, 0), (0, 0, 270))):
            Circle(SKETCH36_R)
        with Locations(Location((13.747005643, -39, 0), (0, 0, 270))):
            Circle(SKETCH36_R)
    extrude(amount=-CUT_EXTRUDE20_DEPTH, mode=Mode.SUBTRACT)


solid = part.part
